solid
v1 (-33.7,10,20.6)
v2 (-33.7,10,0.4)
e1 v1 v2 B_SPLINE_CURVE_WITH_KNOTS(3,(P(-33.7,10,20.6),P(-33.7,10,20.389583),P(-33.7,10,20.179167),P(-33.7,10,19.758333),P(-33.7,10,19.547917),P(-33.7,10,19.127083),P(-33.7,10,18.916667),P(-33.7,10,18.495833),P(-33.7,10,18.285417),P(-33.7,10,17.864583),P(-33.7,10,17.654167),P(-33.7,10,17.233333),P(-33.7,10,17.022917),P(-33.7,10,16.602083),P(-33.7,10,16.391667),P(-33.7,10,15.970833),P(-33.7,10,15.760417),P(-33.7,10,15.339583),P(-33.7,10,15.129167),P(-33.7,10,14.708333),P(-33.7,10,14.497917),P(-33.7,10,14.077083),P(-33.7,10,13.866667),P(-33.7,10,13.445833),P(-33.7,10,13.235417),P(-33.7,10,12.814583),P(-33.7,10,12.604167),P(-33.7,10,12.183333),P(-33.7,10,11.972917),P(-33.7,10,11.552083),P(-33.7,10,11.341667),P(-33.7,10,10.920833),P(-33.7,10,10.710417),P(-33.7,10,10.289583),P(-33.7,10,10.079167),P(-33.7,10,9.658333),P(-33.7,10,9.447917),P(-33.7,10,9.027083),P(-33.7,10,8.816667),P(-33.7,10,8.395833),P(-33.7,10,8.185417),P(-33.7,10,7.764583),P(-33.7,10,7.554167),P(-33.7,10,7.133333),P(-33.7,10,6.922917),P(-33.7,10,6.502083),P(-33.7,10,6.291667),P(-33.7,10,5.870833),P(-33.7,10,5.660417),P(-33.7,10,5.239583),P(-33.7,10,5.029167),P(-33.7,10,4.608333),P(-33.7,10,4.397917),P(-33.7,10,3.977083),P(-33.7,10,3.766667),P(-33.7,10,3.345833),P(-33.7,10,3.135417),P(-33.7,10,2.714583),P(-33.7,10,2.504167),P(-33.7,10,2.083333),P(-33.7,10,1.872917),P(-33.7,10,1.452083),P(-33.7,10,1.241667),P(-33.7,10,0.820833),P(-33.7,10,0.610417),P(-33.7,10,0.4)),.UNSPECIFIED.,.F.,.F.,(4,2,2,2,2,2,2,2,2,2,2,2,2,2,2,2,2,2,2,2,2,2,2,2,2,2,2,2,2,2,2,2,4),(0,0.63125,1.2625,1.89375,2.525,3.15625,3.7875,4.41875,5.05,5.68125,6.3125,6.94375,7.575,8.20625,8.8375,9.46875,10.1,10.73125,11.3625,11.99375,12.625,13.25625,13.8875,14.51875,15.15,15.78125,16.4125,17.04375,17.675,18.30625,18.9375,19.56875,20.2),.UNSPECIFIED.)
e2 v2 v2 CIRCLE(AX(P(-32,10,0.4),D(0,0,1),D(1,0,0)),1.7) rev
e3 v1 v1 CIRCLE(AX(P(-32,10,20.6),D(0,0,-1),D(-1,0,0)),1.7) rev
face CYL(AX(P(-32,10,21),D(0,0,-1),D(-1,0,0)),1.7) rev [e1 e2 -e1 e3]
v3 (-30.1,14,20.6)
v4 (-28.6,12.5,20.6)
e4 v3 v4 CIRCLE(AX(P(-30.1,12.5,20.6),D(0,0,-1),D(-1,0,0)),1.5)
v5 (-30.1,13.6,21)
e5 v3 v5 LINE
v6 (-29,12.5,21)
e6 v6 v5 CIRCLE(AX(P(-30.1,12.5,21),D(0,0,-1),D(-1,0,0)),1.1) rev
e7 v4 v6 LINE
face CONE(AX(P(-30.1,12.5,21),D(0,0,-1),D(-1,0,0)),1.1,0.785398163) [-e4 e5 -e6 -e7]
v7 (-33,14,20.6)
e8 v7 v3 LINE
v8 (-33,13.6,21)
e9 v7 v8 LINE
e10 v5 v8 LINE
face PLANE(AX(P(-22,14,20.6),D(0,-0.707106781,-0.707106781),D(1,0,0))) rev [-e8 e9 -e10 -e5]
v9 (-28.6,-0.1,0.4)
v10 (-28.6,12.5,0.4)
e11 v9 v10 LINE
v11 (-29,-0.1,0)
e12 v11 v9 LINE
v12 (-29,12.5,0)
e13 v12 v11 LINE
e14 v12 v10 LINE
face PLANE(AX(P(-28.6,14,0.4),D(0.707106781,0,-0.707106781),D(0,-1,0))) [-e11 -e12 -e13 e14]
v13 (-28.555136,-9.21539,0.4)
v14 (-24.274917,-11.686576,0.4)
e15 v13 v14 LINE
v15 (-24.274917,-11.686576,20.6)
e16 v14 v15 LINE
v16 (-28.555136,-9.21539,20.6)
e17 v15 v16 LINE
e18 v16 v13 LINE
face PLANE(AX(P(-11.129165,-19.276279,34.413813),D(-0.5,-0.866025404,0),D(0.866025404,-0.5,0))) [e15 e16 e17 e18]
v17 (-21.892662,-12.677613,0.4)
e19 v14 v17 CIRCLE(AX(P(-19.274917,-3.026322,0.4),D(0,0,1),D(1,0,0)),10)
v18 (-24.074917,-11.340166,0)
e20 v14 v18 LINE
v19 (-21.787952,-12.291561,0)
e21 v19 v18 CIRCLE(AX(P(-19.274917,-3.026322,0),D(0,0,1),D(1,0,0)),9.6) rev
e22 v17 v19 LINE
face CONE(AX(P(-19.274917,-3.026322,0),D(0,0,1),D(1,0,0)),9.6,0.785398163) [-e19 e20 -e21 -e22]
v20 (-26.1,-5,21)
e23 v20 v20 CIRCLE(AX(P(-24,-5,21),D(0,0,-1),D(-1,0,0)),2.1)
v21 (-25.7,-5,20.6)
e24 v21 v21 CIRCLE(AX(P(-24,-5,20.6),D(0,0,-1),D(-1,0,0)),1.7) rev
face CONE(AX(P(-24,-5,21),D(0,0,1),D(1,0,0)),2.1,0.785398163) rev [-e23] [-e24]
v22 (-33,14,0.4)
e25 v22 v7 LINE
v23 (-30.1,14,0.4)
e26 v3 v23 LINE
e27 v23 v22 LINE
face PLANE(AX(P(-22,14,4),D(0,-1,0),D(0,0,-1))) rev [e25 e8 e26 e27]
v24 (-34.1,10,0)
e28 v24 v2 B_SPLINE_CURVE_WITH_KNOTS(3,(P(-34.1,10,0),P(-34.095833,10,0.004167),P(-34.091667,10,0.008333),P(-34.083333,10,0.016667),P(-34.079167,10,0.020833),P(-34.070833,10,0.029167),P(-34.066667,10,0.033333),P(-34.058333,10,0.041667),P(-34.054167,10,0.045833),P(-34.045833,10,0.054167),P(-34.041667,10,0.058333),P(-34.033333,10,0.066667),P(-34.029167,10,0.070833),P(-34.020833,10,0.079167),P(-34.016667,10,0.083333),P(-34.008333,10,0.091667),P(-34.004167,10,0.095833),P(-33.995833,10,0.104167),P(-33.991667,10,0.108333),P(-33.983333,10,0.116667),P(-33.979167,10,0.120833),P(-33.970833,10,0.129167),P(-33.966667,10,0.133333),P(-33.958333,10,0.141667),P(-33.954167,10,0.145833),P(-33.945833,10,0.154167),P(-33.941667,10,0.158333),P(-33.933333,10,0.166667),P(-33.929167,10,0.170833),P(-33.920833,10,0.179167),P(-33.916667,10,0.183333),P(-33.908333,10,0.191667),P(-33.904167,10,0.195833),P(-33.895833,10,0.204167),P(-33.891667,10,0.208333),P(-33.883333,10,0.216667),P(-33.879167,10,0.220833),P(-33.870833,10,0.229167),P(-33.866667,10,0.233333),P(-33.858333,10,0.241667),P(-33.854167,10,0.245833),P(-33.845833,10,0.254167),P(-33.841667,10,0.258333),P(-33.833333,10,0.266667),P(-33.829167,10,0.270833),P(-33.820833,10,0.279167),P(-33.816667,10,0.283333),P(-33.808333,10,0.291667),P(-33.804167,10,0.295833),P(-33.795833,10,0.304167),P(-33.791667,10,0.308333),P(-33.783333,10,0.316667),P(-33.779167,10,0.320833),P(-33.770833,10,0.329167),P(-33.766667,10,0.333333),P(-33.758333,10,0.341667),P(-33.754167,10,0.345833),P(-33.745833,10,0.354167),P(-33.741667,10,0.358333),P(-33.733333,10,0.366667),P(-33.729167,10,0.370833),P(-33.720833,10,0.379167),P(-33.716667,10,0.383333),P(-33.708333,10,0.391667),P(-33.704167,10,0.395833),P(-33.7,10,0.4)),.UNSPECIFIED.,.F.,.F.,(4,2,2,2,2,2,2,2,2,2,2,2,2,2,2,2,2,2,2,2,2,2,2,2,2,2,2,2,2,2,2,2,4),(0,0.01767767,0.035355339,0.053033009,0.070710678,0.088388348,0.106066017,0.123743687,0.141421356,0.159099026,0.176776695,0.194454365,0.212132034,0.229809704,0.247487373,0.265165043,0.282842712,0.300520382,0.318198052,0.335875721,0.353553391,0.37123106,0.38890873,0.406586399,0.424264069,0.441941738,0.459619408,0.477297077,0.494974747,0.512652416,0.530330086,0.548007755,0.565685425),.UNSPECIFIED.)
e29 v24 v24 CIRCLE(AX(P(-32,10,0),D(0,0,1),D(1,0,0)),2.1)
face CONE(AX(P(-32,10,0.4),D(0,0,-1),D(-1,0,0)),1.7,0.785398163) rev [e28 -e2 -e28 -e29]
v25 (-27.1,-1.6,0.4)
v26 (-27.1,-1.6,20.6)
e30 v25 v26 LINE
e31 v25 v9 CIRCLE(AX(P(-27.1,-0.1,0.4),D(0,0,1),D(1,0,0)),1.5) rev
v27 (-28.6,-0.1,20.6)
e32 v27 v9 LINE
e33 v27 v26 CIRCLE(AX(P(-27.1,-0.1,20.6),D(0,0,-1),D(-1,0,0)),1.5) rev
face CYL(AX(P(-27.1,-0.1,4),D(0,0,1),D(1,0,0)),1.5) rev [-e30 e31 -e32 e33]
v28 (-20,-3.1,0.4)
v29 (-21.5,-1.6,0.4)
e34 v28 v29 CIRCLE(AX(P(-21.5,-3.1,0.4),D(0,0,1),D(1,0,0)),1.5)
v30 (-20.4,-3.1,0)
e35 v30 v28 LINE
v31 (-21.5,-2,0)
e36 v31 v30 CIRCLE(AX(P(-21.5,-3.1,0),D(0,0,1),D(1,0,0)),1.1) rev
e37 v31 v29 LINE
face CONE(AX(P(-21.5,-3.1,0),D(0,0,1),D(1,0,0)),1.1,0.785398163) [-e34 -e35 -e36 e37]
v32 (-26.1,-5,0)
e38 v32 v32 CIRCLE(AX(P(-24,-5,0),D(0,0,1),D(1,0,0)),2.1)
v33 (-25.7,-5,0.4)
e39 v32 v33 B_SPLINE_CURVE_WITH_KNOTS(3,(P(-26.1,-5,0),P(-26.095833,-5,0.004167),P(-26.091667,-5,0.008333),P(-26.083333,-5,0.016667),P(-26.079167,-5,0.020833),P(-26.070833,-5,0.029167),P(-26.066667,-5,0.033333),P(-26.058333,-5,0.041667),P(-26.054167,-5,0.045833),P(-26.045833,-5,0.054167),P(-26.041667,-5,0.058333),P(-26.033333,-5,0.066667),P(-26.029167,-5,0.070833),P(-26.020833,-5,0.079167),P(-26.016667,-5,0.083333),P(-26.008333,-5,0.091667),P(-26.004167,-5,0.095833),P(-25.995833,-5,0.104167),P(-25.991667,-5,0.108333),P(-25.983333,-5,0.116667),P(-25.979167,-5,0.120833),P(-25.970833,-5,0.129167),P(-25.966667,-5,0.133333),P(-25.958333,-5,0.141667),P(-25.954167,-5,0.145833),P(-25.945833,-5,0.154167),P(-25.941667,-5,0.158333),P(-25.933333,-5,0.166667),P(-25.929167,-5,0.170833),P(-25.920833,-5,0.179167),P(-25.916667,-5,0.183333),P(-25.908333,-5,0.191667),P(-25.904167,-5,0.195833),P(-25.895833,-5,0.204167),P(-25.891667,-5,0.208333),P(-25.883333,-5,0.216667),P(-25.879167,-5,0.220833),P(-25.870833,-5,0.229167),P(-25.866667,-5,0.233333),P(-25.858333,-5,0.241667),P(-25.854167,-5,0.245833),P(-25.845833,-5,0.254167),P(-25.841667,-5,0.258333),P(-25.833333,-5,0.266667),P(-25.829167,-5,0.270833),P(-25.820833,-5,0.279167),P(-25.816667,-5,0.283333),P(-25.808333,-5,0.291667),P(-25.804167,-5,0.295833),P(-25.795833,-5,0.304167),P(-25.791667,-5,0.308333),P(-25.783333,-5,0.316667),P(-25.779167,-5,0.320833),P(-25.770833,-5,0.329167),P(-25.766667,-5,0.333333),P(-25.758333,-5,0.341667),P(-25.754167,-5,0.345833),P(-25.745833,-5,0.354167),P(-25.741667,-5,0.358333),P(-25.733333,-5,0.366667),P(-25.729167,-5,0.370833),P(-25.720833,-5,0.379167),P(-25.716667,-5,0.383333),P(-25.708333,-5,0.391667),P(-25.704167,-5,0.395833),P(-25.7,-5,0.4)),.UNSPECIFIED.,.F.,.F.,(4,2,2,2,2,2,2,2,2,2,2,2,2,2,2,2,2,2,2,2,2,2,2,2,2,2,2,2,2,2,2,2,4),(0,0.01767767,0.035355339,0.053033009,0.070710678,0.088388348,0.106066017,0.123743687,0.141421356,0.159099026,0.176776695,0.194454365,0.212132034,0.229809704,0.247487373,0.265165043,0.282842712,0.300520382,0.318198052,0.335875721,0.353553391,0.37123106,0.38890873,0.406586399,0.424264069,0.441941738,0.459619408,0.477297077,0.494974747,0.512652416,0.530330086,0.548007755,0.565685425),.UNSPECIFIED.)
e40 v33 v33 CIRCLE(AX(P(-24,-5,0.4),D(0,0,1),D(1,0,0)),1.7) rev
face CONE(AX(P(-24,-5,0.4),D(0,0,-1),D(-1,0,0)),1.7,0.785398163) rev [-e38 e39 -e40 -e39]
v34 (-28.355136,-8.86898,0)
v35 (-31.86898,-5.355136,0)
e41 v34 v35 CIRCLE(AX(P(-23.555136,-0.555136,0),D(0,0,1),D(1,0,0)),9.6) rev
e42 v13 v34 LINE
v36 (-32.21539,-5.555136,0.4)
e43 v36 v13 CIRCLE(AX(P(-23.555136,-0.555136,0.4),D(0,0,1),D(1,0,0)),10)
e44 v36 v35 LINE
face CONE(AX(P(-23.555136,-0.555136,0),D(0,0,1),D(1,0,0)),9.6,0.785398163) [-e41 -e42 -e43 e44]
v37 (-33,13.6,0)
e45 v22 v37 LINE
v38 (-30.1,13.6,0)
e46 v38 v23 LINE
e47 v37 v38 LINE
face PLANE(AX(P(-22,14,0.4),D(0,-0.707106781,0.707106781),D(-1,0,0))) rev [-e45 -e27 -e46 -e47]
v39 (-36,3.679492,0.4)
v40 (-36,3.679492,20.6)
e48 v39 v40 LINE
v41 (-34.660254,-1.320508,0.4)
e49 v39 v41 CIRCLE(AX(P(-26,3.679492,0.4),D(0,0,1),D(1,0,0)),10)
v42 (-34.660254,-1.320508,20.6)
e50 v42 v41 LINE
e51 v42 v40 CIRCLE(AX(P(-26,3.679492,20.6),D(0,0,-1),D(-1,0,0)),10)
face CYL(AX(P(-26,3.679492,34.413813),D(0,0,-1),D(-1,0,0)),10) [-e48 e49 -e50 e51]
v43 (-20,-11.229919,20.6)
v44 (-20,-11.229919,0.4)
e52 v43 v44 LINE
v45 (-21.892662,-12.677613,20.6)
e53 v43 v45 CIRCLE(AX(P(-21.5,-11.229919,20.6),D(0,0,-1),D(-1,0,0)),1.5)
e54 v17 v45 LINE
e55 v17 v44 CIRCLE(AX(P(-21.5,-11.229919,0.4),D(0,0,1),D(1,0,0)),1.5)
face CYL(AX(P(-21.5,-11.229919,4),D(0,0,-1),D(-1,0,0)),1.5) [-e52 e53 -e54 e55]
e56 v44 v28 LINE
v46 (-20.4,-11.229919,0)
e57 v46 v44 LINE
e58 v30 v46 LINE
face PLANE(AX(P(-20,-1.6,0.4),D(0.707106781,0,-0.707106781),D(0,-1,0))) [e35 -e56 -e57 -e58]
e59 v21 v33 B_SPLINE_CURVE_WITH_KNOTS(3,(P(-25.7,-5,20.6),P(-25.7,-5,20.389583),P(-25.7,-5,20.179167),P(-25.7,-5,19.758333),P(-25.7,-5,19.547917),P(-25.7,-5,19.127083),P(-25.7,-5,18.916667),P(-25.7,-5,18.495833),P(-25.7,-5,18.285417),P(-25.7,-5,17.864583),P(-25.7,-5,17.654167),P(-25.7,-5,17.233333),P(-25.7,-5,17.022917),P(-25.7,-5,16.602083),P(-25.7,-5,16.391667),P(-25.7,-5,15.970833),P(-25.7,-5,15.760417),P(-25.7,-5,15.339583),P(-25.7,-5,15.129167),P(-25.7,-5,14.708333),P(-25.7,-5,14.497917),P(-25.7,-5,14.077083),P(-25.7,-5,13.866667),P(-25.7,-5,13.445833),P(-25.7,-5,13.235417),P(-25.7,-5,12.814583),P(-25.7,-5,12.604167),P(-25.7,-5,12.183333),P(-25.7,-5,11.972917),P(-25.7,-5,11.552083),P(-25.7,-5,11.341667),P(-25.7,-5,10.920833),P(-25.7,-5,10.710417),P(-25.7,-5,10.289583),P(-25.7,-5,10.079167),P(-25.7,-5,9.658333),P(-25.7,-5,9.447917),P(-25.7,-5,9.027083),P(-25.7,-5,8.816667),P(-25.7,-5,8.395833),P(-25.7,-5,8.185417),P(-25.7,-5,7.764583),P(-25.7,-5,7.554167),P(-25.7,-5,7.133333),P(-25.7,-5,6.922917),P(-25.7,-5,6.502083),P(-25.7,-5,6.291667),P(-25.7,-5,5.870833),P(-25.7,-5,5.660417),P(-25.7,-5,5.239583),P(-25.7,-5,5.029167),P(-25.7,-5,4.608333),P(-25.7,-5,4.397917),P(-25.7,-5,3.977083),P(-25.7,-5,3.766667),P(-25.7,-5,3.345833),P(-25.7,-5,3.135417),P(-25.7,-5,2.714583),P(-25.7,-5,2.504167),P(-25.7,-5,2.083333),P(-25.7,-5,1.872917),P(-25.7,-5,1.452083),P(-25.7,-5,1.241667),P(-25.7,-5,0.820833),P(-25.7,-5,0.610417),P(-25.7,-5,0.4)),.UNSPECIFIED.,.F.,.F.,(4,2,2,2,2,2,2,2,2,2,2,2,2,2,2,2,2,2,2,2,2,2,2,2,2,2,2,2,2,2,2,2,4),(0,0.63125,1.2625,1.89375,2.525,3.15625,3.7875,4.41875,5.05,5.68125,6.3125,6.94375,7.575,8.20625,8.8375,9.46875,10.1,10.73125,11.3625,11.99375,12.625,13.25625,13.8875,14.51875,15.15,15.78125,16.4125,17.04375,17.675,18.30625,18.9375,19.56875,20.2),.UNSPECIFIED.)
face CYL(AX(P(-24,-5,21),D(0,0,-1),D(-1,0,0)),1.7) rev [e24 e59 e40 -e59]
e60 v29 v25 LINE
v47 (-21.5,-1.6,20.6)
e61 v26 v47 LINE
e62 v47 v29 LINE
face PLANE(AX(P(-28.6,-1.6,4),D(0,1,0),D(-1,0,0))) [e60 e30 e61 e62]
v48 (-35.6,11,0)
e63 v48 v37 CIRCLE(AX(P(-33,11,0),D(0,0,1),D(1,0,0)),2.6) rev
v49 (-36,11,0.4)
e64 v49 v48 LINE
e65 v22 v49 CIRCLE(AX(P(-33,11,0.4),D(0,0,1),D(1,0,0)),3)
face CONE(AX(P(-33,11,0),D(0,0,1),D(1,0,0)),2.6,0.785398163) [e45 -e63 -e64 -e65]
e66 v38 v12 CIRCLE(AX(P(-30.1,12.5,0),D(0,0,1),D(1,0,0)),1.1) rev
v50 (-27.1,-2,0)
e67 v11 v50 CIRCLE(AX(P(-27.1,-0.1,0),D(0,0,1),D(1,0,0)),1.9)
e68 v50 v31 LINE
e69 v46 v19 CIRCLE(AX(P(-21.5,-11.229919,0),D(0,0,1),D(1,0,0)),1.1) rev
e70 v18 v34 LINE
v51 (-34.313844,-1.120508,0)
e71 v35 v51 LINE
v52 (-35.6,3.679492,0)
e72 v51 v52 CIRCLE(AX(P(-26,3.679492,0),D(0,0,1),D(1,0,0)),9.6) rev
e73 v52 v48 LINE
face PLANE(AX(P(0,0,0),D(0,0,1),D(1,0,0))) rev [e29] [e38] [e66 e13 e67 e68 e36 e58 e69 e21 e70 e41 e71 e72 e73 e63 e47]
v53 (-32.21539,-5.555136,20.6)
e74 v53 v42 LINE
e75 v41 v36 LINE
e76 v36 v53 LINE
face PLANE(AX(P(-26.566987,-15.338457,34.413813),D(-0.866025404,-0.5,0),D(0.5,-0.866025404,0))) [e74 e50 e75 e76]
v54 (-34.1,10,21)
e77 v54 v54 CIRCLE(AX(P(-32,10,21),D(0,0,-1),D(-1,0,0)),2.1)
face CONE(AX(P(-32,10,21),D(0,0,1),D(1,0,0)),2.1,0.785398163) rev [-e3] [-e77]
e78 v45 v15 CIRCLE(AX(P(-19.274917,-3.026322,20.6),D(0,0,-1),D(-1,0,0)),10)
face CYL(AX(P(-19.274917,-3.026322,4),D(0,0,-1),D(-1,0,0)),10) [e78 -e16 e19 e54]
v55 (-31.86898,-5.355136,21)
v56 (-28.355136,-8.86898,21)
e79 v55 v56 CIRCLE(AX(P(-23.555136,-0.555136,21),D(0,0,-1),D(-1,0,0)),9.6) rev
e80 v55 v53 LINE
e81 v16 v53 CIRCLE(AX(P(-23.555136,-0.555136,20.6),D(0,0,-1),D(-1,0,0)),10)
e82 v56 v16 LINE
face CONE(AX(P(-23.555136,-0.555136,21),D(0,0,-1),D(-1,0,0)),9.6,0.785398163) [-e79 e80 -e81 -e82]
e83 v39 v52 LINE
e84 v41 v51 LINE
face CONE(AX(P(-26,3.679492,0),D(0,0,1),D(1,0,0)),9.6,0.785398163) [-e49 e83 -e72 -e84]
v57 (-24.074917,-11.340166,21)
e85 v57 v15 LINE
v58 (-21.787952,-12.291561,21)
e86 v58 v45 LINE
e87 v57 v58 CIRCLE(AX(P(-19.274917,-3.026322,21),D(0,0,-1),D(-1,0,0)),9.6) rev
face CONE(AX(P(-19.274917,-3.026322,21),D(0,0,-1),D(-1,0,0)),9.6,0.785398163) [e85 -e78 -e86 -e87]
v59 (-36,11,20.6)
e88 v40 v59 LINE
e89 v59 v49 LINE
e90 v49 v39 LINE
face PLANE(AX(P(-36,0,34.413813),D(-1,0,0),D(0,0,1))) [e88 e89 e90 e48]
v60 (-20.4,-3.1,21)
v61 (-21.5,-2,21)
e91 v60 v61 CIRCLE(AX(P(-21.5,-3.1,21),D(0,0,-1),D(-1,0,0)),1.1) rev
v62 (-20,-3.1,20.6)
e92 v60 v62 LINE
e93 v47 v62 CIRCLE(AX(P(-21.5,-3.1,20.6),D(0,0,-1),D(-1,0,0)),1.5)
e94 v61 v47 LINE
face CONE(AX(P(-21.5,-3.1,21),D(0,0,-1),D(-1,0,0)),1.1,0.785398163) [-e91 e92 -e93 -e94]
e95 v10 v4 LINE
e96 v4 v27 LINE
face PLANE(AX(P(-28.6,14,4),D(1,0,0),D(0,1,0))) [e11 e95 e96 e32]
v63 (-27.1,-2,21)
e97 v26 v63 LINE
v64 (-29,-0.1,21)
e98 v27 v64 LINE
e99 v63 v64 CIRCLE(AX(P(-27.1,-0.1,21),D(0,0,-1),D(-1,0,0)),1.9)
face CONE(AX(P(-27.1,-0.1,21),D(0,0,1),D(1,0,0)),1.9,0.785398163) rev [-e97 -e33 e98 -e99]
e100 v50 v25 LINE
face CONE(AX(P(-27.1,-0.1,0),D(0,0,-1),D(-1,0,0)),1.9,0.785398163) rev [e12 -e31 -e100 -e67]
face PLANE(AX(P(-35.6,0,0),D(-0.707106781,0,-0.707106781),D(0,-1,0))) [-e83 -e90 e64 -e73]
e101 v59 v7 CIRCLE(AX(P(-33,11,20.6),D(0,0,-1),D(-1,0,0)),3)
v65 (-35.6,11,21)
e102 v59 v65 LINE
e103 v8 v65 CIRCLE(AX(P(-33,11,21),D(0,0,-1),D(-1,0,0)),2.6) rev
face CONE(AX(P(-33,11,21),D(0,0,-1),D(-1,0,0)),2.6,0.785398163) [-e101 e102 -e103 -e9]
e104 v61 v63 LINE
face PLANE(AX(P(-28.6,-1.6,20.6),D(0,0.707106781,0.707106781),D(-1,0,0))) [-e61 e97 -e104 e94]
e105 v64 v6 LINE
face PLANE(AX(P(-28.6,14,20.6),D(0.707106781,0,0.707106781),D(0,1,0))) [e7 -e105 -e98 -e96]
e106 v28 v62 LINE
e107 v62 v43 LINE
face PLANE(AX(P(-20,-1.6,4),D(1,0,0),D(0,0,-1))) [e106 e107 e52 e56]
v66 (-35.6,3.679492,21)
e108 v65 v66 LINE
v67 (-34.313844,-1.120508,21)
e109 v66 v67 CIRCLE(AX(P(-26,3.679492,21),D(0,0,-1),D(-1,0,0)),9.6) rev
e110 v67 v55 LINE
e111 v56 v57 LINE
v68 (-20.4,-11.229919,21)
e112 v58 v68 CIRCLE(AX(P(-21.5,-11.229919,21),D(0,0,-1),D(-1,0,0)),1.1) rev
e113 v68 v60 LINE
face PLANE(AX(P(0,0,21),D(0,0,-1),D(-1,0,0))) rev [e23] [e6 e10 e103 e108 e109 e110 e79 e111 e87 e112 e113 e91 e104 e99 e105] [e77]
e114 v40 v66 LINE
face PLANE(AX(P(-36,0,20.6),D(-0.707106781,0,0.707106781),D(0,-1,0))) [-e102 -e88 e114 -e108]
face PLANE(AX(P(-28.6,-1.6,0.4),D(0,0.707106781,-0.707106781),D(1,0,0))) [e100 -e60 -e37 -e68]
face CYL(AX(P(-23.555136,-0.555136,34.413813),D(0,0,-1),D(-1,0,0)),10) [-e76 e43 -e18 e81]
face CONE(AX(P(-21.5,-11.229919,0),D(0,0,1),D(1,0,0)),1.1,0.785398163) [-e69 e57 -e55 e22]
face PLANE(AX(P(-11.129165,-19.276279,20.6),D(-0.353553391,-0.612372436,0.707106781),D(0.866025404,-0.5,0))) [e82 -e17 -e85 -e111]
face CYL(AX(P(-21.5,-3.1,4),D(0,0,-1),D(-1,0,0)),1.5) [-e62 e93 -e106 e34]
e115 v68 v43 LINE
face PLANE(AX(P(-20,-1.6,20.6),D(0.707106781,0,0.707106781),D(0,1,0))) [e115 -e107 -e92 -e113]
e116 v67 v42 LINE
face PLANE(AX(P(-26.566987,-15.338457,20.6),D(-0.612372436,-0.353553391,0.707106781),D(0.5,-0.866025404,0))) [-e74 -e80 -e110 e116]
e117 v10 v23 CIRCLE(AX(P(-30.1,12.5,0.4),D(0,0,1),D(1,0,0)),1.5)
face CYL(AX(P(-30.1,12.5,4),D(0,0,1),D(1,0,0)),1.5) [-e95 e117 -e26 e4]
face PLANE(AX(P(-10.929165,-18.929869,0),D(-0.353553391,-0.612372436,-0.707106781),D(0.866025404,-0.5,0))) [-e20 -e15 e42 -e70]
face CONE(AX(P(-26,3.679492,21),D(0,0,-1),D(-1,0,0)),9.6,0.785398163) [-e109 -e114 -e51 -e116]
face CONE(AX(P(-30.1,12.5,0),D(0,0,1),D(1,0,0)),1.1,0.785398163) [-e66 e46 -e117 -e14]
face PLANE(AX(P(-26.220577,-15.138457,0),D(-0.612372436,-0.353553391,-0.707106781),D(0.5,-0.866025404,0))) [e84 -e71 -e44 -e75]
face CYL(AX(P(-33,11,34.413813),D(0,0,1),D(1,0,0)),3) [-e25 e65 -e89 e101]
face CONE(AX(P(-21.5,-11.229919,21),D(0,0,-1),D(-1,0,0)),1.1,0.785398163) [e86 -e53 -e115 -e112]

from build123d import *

# Parameters (mm, degrees)
SKETCH_2_R               = 7.1
SKETCH_2_R_2             = 6.1
EXTRUDE_1_DEPTH          = 2.2
SKETCH_2_3_R             = 9
SKETCH_2_3_R_2           = 7.1
EXTRUDE_2_DEPTH          = 4
EXTRUDE_3_DEPTH          = 4
SKETCH_4_W               = 44
SKETCH_4_H               = 27
SKETCH_4_W_2             = 38
SKETCH_4_H_2             = 21
EXTRUDE_4_DEPTH          = 4
EXTRUDE_1_2_DEPTH        = 4
DELETE_FACE_1_DEPTH      = 4
FILLET_4_R               = 0.5
FILLET_5_R               = 0.4
FILLET_6_R               = 1
SKETCH_8_R               = 2.2
EXTRUDE_7_DEPTH          = 4
CUT_EXTRUDE_1_DEPTH      = 39.832975817
CUT_EXTRUDE_1_DEPTH_BACK = 39.832975817
CUT_EXTRUDE_2_DEPTH      = 39.832975817
CUT_EXTRUDE_2_DEPTH_BACK = 39.832975817
SKETCH_9_OUTSIDE_W       = 89.4
SKETCH_9_OUTSIDE_H       = 44.4
SKETCH_9_OUTSIDE_R       = 1.7
SKETCH_9_2_R             = 1.7
EXTRUDE_8_DEPTH          = 21
FILLET_7_R               = 10
FILLET_8_R               = 3
FILLET_9_R               = 1.5
CHAMFER_1_SIZE           = 0.4


# Read off the part's stored shape, not the designer's step: 删除面1
with BuildPart() as part:
    # 草图2 → Extrude 1 (new body)
    with BuildSketch(Plane.XY):
        Circle(SKETCH_2_R)
        Circle(SKETCH_2_R_2, mode=Mode.SUBTRACT)
    extrude(amount=EXTRUDE_1_DEPTH)

    # 草图2<3> → 凸台-拉伸2 (add)
    with BuildSketch(Plane.XY):
        Circle(SKETCH_2_3_R)
        Circle(SKETCH_2_3_R_2, mode=Mode.SUBTRACT)
    extrude(amount=EXTRUDE_2_DEPTH)

    # 草图3 → 凸台-拉伸3 (add)
    with BuildSketch(Plane.XY):
        with BuildLine():
            Line((6, 6.708203932), (6, 9.5))
            Line((6, 9.5), (-6, 9.5))
            Line((-6, 9.5), (-6, 6.708203932))
            ThreePointArc((-6, 6.708203932), (0, 9), (6, 6.708203932))
        make_face()
        with BuildLine():
            Line((-6, -9.5), (6, -9.5))
            Line((6, -9.5), (6, -6.708203932))
            ThreePointArc((6, -6.708203932), (0, -9), (-6, -6.708203932))
            Line((-6, -6.708203932), (-6, -9.5))
        make_face()
    extrude(amount=EXTRUDE_3_DEPTH)



with BuildPart() as body_2:
    # 草图4 → 凸台-拉伸4 (new body)
    with BuildSketch(Plane.XY):
        with Locations((0, 0.5)):
            Rectangle(SKETCH_4_W, SKETCH_4_H)
        with Locations((0, 0.5)):
            Rectangle(SKETCH_4_W_2, SKETCH_4_H_2, mode=Mode.SUBTRACT)
    extrude(amount=EXTRUDE_4_DEPTH)


with BuildPart() as part_1:
    add(part.part)

    add(body_2.part)  # Extrude 1 2 merges body 2
    # 草图7 → Extrude 1 2 (add)
    with BuildSketch(Plane.XY):
        with BuildLine():
            ThreePointArc((19.19111663, -8.148610709), (15.188418529, -6.736776188), (10.944962783, -6.647601418))
            ThreePointArc((10.944962783, -6.647601418), (8.412688328, -7.06534444), (5.904962783, -7.611454086))
            Line((5.904962783, -7.611454086), (6.095037217, -8.388545914))
            ThreePointArc((6.095037217, -8.388545914), (8.562957594, -7.851104675), (11.055037217, -7.439992495))
            ThreePointArc((11.055037217, -7.439992495), (15.04515232, -7.523843398), (18.80888337, -8.851389291))
            Line((18.80888337, -8.851389291), (19.19111663, -8.148610709))
        make_face()
        with BuildLine():
            ThreePointArc((-18.80888337, -8.851389291), (-15.04515232, -7.523843398), (-11.055037217, -7.439992495))
            ThreePointArc((-11.055037217, -7.439992495), (-8.562957594, -7.851104675), (-6.095037217, -8.388545914))
            Line((-6.095037217, -8.388545914), (-5.904962783, -7.611454086))
            ThreePointArc((-5.904962783, -7.611454086), (-8.412688328, -7.06534444), (-10.944962783, -6.647601418))
            ThreePointArc((-10.944962783, -6.647601418), (-15.188418529, -6.736776188), (-19.19111663, -8.148610709))
            Line((-19.19111663, -8.148610709), (-18.80888337, -8.851389291))
        make_face()
        with BuildLine():
            ThreePointArc((-18.80888337, 7.148610709), (-15.04515232, 8.476156602), (-11.055037217, 8.560007505))
            ThreePointArc((-11.055037217, 8.560007505), (-8.562957594, 8.148895325), (-6.095037217, 7.611454086))
            Line((-6.095037217, 7.611454086), (-5.904962783, 8.388545914))
            ThreePointArc((-5.904962783, 8.388545914), (-8.412688328, 8.93465556), (-10.944962783, 9.352398582))
            ThreePointArc((-10.944962783, 9.352398582), (-15.188418529, 9.263223812), (-19.19111663, 7.851389291))
            Line((-19.19111663, 7.851389291), (-18.80888337, 7.148610709))
        make_face()
        with BuildLine():
            ThreePointArc((19.19111663, 7.851389291), (15.188418529, 9.263223812), (10.944962783, 9.352398582))
            ThreePointArc((10.944962783, 9.352398582), (8.412688328, 8.93465556), (5.904962783, 8.388545914))
            Line((5.904962783, 8.388545914), (6.095037217, 7.611454086))
            ThreePointArc((6.095037217, 7.611454086), (8.562957594, 8.148895325), (11.055037217, 8.560007505))
            ThreePointArc((11.055037217, 8.560007505), (15.04515232, 8.476156602), (18.80888337, 7.148610709))
            Line((18.80888337, 7.148610709), (19.19111663, 7.851389291))
        make_face()
    extrude(amount=EXTRUDE_1_2_DEPTH)

    # Delete Face 1 outline → Delete Face 1 (add)
    with BuildSketch(Plane.XY):
        with BuildLine():
            ThreePointArc((-19, 7.042506057), (-18.904671788, 7.095972847), (-18.80888337, 7.148610709))
            Line((-18.80888337, 7.148610709), (-19, 7.5))
            Line((-19, 7.5), (-19, 7.042506057))
        make_face()
        with BuildLine():
            Line((-6, 7.588108866), (-6, 8))
            Line((-6, 8), (-6.095037217, 7.611454086))
            ThreePointArc((-6.095037217, 7.611454086), (-6.047512851, 7.599804915), (-6, 7.588108866))
        make_face()
        with BuildLine():
            ThreePointArc((-19, -8.957493943), (-18.904671788, -8.904027153), (-18.80888337, -8.851389291))
            Line((-18.80888337, -8.851389291), (-19, -8.5))
            Line((-19, -8.5), (-19, -8.957493943))
        make_face()
        with BuildLine():
            Line((-6, -8.411891134), (-6, -8))
            Line((-6, -8), (-6.095037217, -8.388545914))
            ThreePointArc((-6.095037217, -8.388545914), (-6.047512851, -8.400195085), (-6, -8.411891134))
        make_face()
        with BuildLine():
            Line((6.095037217, 7.611454086), (6, 8))
            Line((6, 8), (6, 7.588108866))
            ThreePointArc((6, 7.588108866), (6.047512851, 7.599804915), (6.095037217, 7.611454086))
        make_face()
        with BuildLine():
            Line((19, 7.5), (18.80888337, 7.148610709))
            ThreePointArc((18.80888337, 7.148610709), (18.904671788, 7.095972847), (19, 7.042506057))
            Line((19, 7.042506057), (19, 7.5))
        make_face()
        with BuildLine():
            Line((6.095037217, -8.388545914), (6, -8))
            Line((6, -8), (6, -8.411891134))
            ThreePointArc((6, -8.411891134), (6.047512851, -8.400195085), (6.095037217, -8.388545914))
        make_face()
        with BuildLine():
            Line((19, -8.5), (18.80888337, -8.851389291))
            ThreePointArc((18.80888337, -8.851389291), (18.904671788, -8.904027153), (19, -8.957493943))
            Line((19, -8.957493943), (19, -8.5))
        make_face()
    extrude(amount=DELETE_FACE_1_DEPTH)

    # 圆角4
    fillet_4_edges = [part_1.edges().sort_by_distance(p)[0] for p in [
        (19, -8.046657496, 2),
        (6, -7.588305973, 2),
        (-19, -8.046657496, 2),
        (-6, -7.588305973, 2),
        (-6, 9.5, 2),
        (6, 9.5, 2),
        (6, 6.708203932, 2),
        (-6, 6.708203932, 2),
        (19, -8.957493943, 2),
        (-19, -8.957493943, 2),
        (-19, 7.042506057, 2),
        (19, 7.042506057, 2),
        (6, -6.708203932, 2),
        (-6, -6.708203932, 2),
        (-19, 7.953342504, 2),
        (19, 7.953342504, 2),
    ]]
    fillet(fillet_4_edges, radius=FILLET_4_R)

    # 圆角5
    fillet_5_edges = [part_1.edges().sort_by_distance(p)[0] for p in [
        (6, -8.411891134, 2),
        (-6, -8.411891134, 2),
        (-6, 7.588108866, 2),
        (6, 7.588108866, 2),
        (-6, -9.5, 2),
        (6, -9.5, 2),
        (-6, 8.411694027, 2),
        (-19, -10, 2),
        (19, -10, 2),
        (6, 8.411694027, 2),
    ]]
    fillet(fillet_5_edges, radius=FILLET_5_R)

    # 圆角6
    fillet_6_edges = [part_1.edges().sort_by_distance(p)[0] for p in [
        (19, 11, 2),
        (-19, 11, 2),
    ]]
    fillet(fillet_6_edges, radius=FILLET_6_R)

    # 草图8 → 凸台-拉伸7 (add)
    # profile 1 of 2: a face of its own
    with BuildSketch(Plane.XY):
        Polygon((-30.875644347, -7.875644347), (-22, -13), (-22, 14), (-36, 14), (-36, 1), align=None)
        with BuildLine():
            ThreePointArc((-22.3, 3), (-24, 1.3), (-25.7, 3))
            Line((-25.7, 3), (-25.7, 7))
            ThreePointArc((-25.7, 7), (-24, 8.7), (-22.3, 7))
            Line((-22.3, 7), (-22.3, 3))
        make_face(mode=Mode.SUBTRACT)
        with Locations((-32, 10)):
            Circle(SKETCH_8_R, mode=Mode.SUBTRACT)
    # profile 2 of 2: a face of its own
    with BuildSketch(Plane.XY):
        Polygon((22, -13), (30.875644347, -7.875644347), (36, 1), (36, 14), (22, 14), align=None)
        with BuildLine():
            Line((25.7, 7), (25.7, 3))
            ThreePointArc((25.7, 3), (24, 1.3), (22.3, 3))
            Line((22.3, 3), (22.3, 7))
            ThreePointArc((22.3, 7), (24, 8.7), (25.7, 7))
        make_face(mode=Mode.SUBTRACT)
        with Locations((32, 10)):
            Circle(SKETCH_8_R, mode=Mode.SUBTRACT)
    extrude(amount=EXTRUDE_7_DEPTH)

    # 草图8<3> → 切除-拉伸1 (cut, two sides: drawn at the far end of the back side and taken through both)
    with BuildSketch(Plane.XY.offset(-CUT_EXTRUDE_1_DEPTH_BACK)):
        with BuildLine():
            ThreePointArc((-22, -4.083484861), (-26.2, -5), (-22, -5.916515139))
            Line((-22, -5.916515139), (-22, -4.083484861))
        make_face()
        with BuildLine():
            Line((-22, -4.083484861), (-22, -5.916515139))
            ThreePointArc((-22, -5.916515139), (-21.850581474, -5.469041576), (-21.8, -5))
            ThreePointArc((-21.8, -5), (-21.850581474, -4.530958424), (-22, -4.083484861))
        make_face()
        with BuildLine():
            ThreePointArc((22, -4.083484861), (21.8, -5), (22, -5.916515139))
            Line((22, -5.916515139), (22, -4.083484861))
        make_face()
        with BuildLine():
            Line((22, -4.083484861), (22, -5.916515139))
            ThreePointArc((22, -5.916515139), (24.469041576, -7.149418526), (26.2, -5))
            ThreePointArc((26.2, -5), (24.469041576, -2.850581474), (22, -4.083484861))
        make_face()
    extrude(amount=CUT_EXTRUDE_1_DEPTH + CUT_EXTRUDE_1_DEPTH_BACK, mode=Mode.SUBTRACT)

    # 草图9 outside → 切除-拉伸2 (cut, two sides: drawn at the far end of the back side and taken through both)
    # profile 1 of 3: a face of its own
    with BuildSketch(Plane(origin=(0, 0, 0), x_dir=(-1, 0, 0), z_dir=(0, 0, -1)).offset(-CUT_EXTRUDE_2_DEPTH_BACK)):
        with Locations((0, 0.5)):
            Rectangle(SKETCH_9_OUTSIDE_W, SKETCH_9_OUTSIDE_H)
        Polygon((28.6, 14), (28.6, -1.6), (20, -1.6), (20, -13), (22, -13), (30.875644347, -7.875644347), (36, 1), (36, 14), align=None, mode=Mode.SUBTRACT)
    # profile 2 of 3: a face of its own
    with BuildSketch(Plane(origin=(0, 0, 0), x_dir=(-1, 0, 0), z_dir=(0, 0, -1)).offset(-CUT_EXTRUDE_2_DEPTH_BACK)):
        with Locations((32, 10)):
            Circle(SKETCH_9_OUTSIDE_R)
    # profile 3 of 3: a face of its own
    with BuildSketch(Plane(origin=(0, 0, 0), x_dir=(-1, 0, 0), z_dir=(0, 0, -1)).offset(-CUT_EXTRUDE_2_DEPTH_BACK)):
        with Locations((24, -5)):
            Circle(SKETCH_9_OUTSIDE_R)
    extrude(amount=CUT_EXTRUDE_2_DEPTH + CUT_EXTRUDE_2_DEPTH_BACK, mode=Mode.SUBTRACT)

    # 草图9<2> → 凸台-拉伸8 (add)
    with BuildSketch(Plane(origin=(0, 0, 0), x_dir=(-1, 0, 0), z_dir=(0, 0, -1))):
        Polygon((36, 1), (36, 14), (28.6, 14), (28.6, -1.6), (20, -1.6), (20, -13), (22, -13), (30.875644347, -7.875644347), align=None)
        with Locations((24, -5)):
            Circle(SKETCH_9_2_R, mode=Mode.SUBTRACT)
        with Locations((32, 10)):
            Circle(SKETCH_9_2_R, mode=Mode.SUBTRACT)
    extrude(amount=-EXTRUDE_8_DEPTH)

    # 圆角7
    # the kernel refuses this fillet: 10 mm, written as the material it takes off along each edge
    with BuildSketch(Plane(origin=(-36, 1, 27.698729811), x_dir=(0.5000000000000031, -0.8660254037844369, 0), z_dir=(0, 0, -1))) as fillet_7_piece_1:
        with BuildLine():
            CenterArc((FILLET_7_R * 0.267949192431, -FILLET_7_R), FILLET_7_R, 90, 30)
            Line((-FILLET_7_R * 0.232050807569, -FILLET_7_R * 0.133974596216), (-FILLET_7_R * 0.242050807569, -FILLET_7_R * 0.11665408814))
            Line((-FILLET_7_R * 0.242050807569, -FILLET_7_R * 0.11665408814), (-FILLET_7_R * 0.00535898384862, FILLET_7_R * 0.02))
            Line((-FILLET_7_R * 0.00535898384862, FILLET_7_R * 0.02), (FILLET_7_R * 0.267949192431, FILLET_7_R * 0.02))
            Line((FILLET_7_R * 0.267949192431, FILLET_7_R * 0.02), (FILLET_7_R * 0.267949192431, 0))
        make_face()
    extrude(amount=34.397459622, mode=Mode.SUBTRACT)
    with BuildSketch(Plane(origin=(-30.875644347, -7.875644347, 27.698729811), x_dir=(-0.499999999999999, 0.8660254037844392, 0), z_dir=(0, 0, -1))) as fillet_7_piece_2:
        with BuildLine():
            CenterArc((FILLET_7_R * 0.267949192431, FILLET_7_R), FILLET_7_R, 240, 30)
            Line((-FILLET_7_R * 0.232050807569, FILLET_7_R * 0.133974596216), (-FILLET_7_R * 0.242050807569, FILLET_7_R * 0.11665408814))
            Line((-FILLET_7_R * 0.242050807569, FILLET_7_R * 0.11665408814), (-FILLET_7_R * 0.00535898384862, -FILLET_7_R * 0.02))
            Line((-FILLET_7_R * 0.00535898384862, -FILLET_7_R * 0.02), (FILLET_7_R * 0.267949192431, -FILLET_7_R * 0.02))
            Line((FILLET_7_R * 0.267949192431, -FILLET_7_R * 0.02), (FILLET_7_R * 0.267949192431, 0))
        make_face()
    extrude(amount=34.397459622, mode=Mode.SUBTRACT)
    with BuildSketch(Plane(origin=(-22, -13, -6.56712034), x_dir=(1, 0, 0), z_dir=(0, 0, 1))) as fillet_7_piece_3:
        with BuildLine():
            CenterArc((2.725082782, 9.973678106), FILLET_7_R, 240, 25.841932763)
            Line((-2.274917218, 1.313424068), (-2.374917218, 1.140218987))
            Line((-2.374917218, 1.140218987), (-0.1, -0.173205081))
            Line((-0.1, -0.173205081), (0, -0.2))
            ThreePointArc((0, -0.2), (1, -0.2), (1.985498344, -0.199473562))
            Line((1.985498344, -0.199473562), (2, 0))
        make_face()
    extrude(amount=34.13424068, mode=Mode.SUBTRACT)

    # 圆角8
    fillet_8_edges = [part_1.edges().sort_by_distance(p)[0] for p in [
        (-36, 14, 10.5),
    ]]
    fillet(fillet_8_edges, radius=FILLET_8_R)

    # 圆角9
    fillet_9_edges = [part_1.edges().sort_by_distance(p)[0] for p in [
        (-28.6, -1.6, 10.5),
        (-28.6, 14, 10.5),
        (-20, -1.6, 10.5),
        (-20, -13, 10.5),
    ]]
    fillet(fillet_9_edges, radius=FILLET_9_R)

    # 倒角1
    chamfer_1_edges = [part_1.edges().sort_by_distance(p)[0] for p in [
        (-30.3, 10, 0),
        (-22.3, -5, 0),
        (-22.3, -5, 21),
        (-30.3, 10, 21),
        (-33.437822174, -3.437822174, 21),
        (-33.437822174, -3.437822174, 0),
        (-26.415026744, -10.450983121, 0),
        (-36, 7.339745962, 0),
        (-30.626204083, -7.626204083, 0),
        (-35.659258263, 1.091301473, 0),
        (-36, 7.339745962, 21),
        (-26.415026744, -10.450983121, 21),
        (-23.115886638, -12.259249594, 21),
        (-30.626204083, -7.626204083, 21),
        (-35.659258263, 1.091301473, 21),
        (-35.121320344, 13.121320344, 0),
        (-31.55, 14, 21),
        (-35.121320344, 13.121320344, 21),
        (-31.55, 14, 0),
        (-28.6, 6.2, 0),
        (-24.3, -1.6, 0),
        (-20, -7.164959535, 0),
        (-23.115886638, -12.259249594, 0),
        (-20.588680216, -12.421345211, 0),
        (-20.439339828, -2.039339828, 0),
        (-29.039339828, 13.560660172, 0),
        (-28.6, 6.2, 21),
        (-20, -7.164959535, 21),
        (-24.3, -1.6, 21),
        (-20.588680216, -12.421345211, 21),
        (-20.439339828, -2.039339828, 21),
        (-29.039339828, 13.560660172, 21),
        (-28.160660172, -1.160660172, 0),
        (-28.160660172, -1.160660172, 21),
    ]]
    chamfer(chamfer_1_edges, length=CHAMFER_1_SIZE)


solid = part_1.part
